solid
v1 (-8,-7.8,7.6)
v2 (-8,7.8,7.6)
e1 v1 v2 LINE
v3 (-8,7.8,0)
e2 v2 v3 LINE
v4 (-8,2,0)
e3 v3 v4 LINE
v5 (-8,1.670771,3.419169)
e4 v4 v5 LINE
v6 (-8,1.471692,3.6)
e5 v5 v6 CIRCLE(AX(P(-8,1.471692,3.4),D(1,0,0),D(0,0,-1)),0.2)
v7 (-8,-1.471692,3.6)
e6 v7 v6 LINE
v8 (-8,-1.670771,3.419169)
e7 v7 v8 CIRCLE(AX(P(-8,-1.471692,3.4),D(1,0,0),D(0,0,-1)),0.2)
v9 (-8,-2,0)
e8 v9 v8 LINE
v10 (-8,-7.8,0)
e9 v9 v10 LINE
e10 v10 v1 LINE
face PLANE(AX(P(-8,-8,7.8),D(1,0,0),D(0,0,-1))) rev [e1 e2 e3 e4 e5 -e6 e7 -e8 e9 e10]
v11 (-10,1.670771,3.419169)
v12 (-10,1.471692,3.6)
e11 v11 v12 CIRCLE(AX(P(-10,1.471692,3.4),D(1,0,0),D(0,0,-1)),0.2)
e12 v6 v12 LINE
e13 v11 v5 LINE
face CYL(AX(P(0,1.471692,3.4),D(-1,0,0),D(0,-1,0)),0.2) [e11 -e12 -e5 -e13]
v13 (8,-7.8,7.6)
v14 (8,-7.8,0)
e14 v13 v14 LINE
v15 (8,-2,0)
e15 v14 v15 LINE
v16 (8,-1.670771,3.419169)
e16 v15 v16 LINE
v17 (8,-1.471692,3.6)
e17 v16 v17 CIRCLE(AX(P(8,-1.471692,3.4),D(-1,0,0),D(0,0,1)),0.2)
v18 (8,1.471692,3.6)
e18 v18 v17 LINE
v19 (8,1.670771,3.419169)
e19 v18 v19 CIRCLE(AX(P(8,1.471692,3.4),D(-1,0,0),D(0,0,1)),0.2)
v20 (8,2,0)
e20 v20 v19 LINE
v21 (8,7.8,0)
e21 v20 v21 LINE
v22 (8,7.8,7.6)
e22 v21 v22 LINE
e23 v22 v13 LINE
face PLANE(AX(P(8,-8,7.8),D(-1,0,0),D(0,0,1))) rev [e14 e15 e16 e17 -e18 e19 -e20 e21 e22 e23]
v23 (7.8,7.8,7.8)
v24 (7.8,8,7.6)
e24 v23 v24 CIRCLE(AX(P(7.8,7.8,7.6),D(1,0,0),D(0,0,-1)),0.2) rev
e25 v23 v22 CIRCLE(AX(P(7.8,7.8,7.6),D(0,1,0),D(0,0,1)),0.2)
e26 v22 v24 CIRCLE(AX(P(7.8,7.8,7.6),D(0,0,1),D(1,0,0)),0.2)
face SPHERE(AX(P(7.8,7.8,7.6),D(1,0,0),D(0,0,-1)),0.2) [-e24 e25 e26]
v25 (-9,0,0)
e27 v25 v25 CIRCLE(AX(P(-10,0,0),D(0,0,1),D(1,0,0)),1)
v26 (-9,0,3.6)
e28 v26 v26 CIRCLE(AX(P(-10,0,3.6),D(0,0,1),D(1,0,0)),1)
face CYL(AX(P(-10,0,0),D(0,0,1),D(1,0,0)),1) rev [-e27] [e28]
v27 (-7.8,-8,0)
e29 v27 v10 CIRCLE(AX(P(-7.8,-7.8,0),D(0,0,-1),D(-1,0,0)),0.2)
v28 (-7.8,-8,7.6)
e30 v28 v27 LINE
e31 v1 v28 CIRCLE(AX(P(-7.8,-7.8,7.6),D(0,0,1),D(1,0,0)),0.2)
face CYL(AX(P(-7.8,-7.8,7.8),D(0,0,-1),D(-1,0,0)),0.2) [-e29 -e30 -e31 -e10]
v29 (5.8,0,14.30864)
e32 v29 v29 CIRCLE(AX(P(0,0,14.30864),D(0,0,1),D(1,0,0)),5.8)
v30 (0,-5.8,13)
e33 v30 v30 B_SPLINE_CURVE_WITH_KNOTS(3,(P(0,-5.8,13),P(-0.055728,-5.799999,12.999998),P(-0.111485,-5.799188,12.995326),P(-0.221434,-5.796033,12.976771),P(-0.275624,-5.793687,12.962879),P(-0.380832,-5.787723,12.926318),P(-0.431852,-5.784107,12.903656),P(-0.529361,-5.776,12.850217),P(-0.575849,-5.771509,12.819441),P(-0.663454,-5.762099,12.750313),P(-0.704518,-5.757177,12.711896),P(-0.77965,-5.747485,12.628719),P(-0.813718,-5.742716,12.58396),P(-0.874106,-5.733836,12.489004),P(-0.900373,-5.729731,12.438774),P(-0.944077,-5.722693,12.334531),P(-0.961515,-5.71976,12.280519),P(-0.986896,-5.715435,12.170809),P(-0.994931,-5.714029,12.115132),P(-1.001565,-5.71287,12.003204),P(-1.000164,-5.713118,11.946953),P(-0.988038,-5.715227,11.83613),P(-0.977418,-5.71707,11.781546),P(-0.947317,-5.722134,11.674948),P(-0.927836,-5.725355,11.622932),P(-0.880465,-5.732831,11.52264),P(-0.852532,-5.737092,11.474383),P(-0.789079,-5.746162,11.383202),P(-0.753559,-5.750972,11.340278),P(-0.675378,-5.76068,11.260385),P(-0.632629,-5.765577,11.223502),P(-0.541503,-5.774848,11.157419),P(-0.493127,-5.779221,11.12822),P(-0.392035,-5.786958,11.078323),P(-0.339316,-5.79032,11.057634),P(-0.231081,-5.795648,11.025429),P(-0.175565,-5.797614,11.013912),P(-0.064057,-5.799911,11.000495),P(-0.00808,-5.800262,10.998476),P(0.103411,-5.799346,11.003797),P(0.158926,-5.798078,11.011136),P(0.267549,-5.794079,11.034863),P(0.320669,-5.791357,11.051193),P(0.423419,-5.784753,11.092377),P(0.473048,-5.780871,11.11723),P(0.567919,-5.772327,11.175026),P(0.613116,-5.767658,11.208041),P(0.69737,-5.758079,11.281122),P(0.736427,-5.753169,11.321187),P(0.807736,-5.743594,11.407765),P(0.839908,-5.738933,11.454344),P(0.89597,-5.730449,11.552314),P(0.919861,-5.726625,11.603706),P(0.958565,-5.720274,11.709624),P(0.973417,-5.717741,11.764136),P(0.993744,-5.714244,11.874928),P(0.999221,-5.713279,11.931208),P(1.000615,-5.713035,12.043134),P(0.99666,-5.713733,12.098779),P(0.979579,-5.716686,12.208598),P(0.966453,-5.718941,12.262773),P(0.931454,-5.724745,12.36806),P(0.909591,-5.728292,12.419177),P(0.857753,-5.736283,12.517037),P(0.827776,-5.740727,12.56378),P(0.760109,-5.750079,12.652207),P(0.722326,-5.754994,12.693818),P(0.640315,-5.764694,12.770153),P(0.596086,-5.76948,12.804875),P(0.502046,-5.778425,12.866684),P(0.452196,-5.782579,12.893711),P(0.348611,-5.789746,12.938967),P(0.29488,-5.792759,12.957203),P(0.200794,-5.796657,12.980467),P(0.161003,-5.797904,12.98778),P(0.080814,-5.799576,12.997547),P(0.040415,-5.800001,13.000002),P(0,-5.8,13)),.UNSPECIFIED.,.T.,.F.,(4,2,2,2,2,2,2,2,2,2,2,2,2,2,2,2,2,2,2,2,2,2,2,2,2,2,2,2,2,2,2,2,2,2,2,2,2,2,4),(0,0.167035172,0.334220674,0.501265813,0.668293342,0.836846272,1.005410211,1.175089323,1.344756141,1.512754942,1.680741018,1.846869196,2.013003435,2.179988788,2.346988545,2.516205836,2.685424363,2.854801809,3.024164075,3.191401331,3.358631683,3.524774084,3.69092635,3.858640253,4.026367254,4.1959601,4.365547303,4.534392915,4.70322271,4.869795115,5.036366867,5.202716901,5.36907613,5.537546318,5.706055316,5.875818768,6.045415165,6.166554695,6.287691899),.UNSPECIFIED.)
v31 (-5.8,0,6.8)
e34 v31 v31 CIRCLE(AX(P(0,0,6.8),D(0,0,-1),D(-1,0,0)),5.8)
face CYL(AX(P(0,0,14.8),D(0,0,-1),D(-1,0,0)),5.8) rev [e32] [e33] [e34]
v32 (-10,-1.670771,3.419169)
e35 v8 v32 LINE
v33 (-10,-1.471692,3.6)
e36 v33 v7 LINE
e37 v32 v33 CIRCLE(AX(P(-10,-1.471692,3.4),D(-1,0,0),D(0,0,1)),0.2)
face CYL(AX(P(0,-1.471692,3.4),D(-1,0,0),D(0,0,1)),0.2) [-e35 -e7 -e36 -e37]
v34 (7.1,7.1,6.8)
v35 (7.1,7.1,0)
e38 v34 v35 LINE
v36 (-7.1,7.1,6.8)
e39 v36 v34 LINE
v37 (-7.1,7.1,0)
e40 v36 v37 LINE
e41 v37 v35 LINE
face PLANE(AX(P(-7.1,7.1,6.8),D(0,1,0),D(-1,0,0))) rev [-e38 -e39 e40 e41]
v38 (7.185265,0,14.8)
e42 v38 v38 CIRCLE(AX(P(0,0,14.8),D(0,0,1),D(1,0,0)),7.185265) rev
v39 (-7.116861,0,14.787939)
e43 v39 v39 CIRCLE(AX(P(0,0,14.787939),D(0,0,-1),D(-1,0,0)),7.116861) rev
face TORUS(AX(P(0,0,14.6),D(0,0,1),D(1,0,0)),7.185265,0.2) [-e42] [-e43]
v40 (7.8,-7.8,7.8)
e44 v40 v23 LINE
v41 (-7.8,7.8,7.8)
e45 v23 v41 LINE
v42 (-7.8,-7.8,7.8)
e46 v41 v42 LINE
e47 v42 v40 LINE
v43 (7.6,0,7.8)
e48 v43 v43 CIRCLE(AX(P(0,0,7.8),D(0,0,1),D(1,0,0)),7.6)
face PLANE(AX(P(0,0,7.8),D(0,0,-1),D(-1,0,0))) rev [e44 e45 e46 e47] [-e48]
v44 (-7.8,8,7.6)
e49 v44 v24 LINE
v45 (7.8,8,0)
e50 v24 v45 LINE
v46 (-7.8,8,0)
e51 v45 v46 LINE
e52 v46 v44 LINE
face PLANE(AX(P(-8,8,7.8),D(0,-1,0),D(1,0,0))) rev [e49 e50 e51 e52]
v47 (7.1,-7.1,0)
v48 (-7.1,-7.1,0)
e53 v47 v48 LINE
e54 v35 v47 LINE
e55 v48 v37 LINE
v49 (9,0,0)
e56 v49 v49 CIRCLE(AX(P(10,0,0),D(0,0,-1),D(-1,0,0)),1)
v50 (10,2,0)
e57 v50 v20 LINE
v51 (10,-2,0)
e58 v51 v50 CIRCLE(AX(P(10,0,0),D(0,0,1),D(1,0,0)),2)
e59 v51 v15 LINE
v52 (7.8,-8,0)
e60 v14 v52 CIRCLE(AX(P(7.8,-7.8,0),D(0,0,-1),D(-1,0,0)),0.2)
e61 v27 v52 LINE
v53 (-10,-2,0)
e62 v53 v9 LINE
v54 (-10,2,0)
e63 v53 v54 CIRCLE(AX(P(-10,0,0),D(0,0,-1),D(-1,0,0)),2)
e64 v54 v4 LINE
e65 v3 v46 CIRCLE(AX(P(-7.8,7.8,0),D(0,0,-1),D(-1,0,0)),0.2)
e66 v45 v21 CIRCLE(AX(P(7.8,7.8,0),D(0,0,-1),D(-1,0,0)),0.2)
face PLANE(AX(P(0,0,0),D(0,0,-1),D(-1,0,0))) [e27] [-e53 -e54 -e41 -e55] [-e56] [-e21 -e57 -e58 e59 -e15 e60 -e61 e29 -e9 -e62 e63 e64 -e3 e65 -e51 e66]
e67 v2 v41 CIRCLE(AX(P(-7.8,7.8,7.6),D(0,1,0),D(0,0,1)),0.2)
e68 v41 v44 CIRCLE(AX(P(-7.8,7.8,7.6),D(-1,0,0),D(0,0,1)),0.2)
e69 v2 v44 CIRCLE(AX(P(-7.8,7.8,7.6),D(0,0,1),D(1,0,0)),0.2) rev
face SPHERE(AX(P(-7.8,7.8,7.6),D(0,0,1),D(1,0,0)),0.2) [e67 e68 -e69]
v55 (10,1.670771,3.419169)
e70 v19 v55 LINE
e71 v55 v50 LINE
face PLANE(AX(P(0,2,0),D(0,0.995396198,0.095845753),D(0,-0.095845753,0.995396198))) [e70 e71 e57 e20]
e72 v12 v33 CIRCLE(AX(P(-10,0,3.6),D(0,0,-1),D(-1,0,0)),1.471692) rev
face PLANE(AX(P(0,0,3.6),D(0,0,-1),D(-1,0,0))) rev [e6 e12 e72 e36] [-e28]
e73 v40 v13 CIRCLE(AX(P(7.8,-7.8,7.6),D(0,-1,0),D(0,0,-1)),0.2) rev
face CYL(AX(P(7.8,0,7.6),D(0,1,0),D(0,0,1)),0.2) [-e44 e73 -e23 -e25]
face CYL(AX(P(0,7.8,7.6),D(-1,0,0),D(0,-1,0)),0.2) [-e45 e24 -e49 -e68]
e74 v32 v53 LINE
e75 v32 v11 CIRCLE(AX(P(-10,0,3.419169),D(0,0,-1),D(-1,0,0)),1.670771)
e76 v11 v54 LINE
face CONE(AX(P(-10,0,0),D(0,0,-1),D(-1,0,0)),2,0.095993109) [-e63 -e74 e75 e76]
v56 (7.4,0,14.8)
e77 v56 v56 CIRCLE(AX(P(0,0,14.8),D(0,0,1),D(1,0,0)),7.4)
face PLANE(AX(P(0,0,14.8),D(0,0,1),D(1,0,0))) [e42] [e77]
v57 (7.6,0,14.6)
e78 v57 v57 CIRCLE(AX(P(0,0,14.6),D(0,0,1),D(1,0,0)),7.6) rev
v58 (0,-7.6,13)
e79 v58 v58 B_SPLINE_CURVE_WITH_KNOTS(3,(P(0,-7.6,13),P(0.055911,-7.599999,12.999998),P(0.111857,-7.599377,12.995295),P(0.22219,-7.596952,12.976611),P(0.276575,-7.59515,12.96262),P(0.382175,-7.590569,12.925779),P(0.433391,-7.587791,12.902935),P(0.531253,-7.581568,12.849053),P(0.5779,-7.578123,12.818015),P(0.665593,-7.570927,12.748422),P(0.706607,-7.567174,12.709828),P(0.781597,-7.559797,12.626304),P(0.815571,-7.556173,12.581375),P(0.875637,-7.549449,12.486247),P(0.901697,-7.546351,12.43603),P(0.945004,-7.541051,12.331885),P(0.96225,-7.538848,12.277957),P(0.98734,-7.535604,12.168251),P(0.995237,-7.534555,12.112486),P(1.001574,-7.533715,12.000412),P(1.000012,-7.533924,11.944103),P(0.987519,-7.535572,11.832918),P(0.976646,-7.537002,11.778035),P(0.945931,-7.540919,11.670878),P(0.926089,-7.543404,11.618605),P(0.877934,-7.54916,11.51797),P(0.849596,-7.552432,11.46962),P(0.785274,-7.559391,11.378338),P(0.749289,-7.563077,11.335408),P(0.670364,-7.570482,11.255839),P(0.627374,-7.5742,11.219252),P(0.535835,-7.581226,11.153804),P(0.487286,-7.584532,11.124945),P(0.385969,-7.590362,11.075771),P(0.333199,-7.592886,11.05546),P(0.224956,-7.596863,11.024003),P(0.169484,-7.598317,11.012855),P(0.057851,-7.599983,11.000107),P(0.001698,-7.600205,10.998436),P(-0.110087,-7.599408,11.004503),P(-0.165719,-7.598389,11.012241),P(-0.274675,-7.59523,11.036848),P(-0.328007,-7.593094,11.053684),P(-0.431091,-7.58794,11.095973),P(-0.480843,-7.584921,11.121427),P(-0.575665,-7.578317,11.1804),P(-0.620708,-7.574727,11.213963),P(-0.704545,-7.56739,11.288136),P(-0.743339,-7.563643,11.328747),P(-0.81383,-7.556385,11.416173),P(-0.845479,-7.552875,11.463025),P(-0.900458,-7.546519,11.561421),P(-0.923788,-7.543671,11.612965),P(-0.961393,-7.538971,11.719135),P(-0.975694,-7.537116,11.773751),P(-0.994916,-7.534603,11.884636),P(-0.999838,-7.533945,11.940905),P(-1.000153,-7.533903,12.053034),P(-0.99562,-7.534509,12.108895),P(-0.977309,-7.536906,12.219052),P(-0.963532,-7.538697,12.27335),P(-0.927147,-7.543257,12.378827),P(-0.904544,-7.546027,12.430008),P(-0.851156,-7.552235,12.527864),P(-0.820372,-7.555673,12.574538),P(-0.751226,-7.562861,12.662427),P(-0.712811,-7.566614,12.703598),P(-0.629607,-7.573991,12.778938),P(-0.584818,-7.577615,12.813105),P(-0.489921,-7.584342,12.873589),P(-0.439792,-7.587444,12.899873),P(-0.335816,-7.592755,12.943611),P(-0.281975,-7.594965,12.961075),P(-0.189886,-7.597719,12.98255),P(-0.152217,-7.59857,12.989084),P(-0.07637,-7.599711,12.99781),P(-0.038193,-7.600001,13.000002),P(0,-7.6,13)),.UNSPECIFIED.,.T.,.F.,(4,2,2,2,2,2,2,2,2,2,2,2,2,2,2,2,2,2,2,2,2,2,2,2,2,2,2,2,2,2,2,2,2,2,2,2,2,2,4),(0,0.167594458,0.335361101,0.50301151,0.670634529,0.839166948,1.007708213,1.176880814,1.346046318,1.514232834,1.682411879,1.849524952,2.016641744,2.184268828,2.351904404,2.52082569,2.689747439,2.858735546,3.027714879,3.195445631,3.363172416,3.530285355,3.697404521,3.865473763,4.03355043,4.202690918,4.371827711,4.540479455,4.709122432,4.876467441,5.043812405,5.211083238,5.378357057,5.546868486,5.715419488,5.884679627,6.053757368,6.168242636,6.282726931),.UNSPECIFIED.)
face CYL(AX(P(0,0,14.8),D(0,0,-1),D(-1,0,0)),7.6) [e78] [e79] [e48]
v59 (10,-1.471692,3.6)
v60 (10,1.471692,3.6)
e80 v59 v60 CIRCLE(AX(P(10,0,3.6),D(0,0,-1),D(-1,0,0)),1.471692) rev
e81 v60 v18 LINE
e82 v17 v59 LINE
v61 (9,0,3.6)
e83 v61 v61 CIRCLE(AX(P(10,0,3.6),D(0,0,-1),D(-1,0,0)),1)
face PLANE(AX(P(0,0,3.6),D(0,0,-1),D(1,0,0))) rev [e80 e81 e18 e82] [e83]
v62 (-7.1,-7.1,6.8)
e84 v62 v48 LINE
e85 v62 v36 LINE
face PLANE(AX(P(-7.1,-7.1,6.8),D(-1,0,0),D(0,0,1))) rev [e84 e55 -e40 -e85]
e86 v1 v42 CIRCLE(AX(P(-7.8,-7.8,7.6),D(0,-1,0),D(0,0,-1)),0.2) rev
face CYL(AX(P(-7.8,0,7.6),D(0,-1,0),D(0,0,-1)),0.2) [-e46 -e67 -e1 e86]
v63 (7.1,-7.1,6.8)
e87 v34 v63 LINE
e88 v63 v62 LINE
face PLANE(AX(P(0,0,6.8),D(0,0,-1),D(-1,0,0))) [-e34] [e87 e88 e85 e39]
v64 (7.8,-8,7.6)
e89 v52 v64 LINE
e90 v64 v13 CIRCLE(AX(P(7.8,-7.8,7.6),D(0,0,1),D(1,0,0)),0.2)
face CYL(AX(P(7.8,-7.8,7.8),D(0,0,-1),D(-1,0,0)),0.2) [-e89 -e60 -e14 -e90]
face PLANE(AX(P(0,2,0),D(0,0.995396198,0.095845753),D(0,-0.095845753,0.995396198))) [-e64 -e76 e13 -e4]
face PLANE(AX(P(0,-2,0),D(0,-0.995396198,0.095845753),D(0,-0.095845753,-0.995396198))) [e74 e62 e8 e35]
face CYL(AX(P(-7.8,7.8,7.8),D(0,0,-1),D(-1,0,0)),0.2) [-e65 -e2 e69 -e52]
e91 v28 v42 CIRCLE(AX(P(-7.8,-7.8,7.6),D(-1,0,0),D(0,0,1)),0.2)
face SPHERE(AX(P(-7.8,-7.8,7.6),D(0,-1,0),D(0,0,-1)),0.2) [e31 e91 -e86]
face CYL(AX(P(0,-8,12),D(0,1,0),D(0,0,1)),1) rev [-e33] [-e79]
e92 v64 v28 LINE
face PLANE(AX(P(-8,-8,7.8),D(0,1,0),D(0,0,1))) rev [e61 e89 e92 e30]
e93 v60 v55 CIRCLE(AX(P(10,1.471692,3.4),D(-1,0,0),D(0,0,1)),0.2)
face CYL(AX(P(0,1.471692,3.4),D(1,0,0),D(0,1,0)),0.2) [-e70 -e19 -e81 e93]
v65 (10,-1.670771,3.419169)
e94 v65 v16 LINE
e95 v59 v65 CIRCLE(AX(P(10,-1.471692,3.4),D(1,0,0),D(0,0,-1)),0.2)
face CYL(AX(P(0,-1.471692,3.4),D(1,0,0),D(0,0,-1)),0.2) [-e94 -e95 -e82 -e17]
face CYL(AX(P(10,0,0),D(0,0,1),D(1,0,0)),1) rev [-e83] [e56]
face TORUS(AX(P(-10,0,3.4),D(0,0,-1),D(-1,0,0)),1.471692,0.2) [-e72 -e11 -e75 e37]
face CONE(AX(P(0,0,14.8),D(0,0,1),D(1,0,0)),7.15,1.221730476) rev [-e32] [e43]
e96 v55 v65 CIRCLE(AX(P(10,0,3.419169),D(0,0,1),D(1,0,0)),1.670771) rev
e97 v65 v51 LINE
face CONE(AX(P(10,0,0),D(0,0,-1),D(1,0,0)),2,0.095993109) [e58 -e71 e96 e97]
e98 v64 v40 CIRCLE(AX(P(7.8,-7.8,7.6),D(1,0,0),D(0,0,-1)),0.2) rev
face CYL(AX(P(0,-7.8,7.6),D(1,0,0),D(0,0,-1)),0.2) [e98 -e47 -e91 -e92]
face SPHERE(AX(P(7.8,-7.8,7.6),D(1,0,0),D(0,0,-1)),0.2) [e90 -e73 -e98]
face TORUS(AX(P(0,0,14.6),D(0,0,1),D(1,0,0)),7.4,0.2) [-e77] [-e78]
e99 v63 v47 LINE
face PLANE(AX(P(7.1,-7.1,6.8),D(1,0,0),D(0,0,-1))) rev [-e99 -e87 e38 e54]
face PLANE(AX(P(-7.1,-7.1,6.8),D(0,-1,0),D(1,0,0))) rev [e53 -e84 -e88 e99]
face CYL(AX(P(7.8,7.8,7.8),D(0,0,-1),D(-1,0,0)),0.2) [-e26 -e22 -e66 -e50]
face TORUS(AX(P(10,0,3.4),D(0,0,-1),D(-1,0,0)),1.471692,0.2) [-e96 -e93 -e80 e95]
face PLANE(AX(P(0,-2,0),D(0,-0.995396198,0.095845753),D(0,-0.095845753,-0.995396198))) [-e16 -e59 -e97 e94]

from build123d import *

# Parameters (mm, degrees)
SKETCH_1_W             = 16
SKETCH_1_H             = 16
EXTRUDE_1_DEPTH        = 7.8
SKETCH_2_R             = 7.6
EXTRUDE_2_DEPTH        = 7
EXTRUDE_3_DEPTH        = 3.6
EXTRUDE_3_TAPER        = 5.5
SKETCH_4_R             = 1
CUT_EXTRUDE_1_DEPTH    = 19.260339646
FILLET_1_R             = 0.2
FILLET_1_OF_MIRROR_1_R = 0.2
SKETCH_5_W             = 14.2
SKETCH_5_H             = 14.2
CUT_EXTRUDE_2_DEPTH    = 6.8
SKETCH_6_R             = 5.8
CUT_EXTRUDE_3_DEPTH    = 17.492422624
CHAMFER_1_SIZE         = 1.35
CHAMFER_1_SIZE2        = 0.491359816
FILLET_2_R             = 0.2
SKETCH_7_R             = 1
CUT_EXTRUDE_4_DEPTH    = 21.664946262
FILLET_3_R             = 0.2


with BuildPart() as part:
    # 草图1 → 凸台-拉伸1 (new body)
    with BuildSketch(Plane.XY):
        Rectangle(SKETCH_1_W, SKETCH_1_H)
    extrude(amount=EXTRUDE_1_DEPTH)

    # 草图2 → 凸台-拉伸2 (add)
    with BuildSketch(Plane.XY.offset(7.8)):
        Circle(SKETCH_2_R)
    extrude(amount=EXTRUDE_2_DEPTH)

    # 草图3 → 凸台-拉伸3 (add)
    with BuildSketch(Plane(origin=(0, 0, 0), x_dir=(-1, 0, 0), z_dir=(0, 0, -1))):
        with BuildLine():
            Line((10, 2), (4, 2))
            Line((4, 2), (4, -2))
            Line((4, -2), (10, -2))
            ThreePointArc((10, -2), (12, 0), (10, 2))
        make_face()
    extrude_3 = extrude(amount=-EXTRUDE_3_DEPTH, taper=EXTRUDE_3_TAPER)

    # 草图4 → 切除-拉伸1 (cut, through all)
    with BuildSketch(Plane.XY.offset(3.6)):
        with Locations((-10, 0)):
            Circle(SKETCH_4_R)
    cut_extrude_1 = extrude(amount=-CUT_EXTRUDE_1_DEPTH, mode=Mode.SUBTRACT)

    # 圆角1
    fillet_1_edges = [part.edges().sort_by_distance(p)[0] for p in [
        (-9, 1.653359426, 3.6),
        (-11.653359426, 0, 3.6),
        (-9, -1.653359426, 3.6),
    ]]
    fillet(fillet_1_edges, radius=FILLET_1_R)

    # 镜向1: 凸台-拉伸3, 切除-拉伸1 across plane
    add(extrude_3.mirror(Plane(origin=(0, 0, 0), x_dir=(0, 0, 1), z_dir=(1, 0, 0))))
    add(cut_extrude_1.mirror(Plane(origin=(0, 0, 0), x_dir=(0, 0, 1), z_dir=(1, 0, 0))), mode=Mode.SUBTRACT)

    # 圆角1 of 镜向1
    fillet_1_of_mirror_1_edges = [part.edges().sort_by_distance(p)[0] for p in [
        (9, 1.653359426, 3.6),
        (11.653359426, 0, 3.6),
        (9, -1.653359426, 3.6),
    ]]
    fillet(fillet_1_of_mirror_1_edges, radius=FILLET_1_OF_MIRROR_1_R)

    # 草图5 → 切除-拉伸2 (cut)
    with BuildSketch(Plane(origin=(0, 0, 0), x_dir=(-1, 0, 0), z_dir=(0, 0, -1))):
        Rectangle(SKETCH_5_W, SKETCH_5_H)
    extrude(amount=-CUT_EXTRUDE_2_DEPTH, mode=Mode.SUBTRACT)

    # 草图6 → 切除-拉伸3 (cut, through all)
    with BuildSketch(Plane(origin=(0, 0, 6.8), x_dir=(-1, 0, 0), z_dir=(0, 0, -1))):
        Circle(SKETCH_6_R)
    extrude(amount=-CUT_EXTRUDE_3_DEPTH, mode=Mode.SUBTRACT)

    # 倒角1
    chamfer_1_edges = [part.edges().sort_by_distance(p)[0] for p in [
        (5.8, 0, 14.8),
    ]]
    chamfer_1_side = [part.faces().sort_by_distance(p)[0] for p in [
        (-7.385039539, 0, 14.8),
    ]]
    chamfer(chamfer_1_edges, length=CHAMFER_1_SIZE, length2=CHAMFER_1_SIZE2, reference=chamfer_1_side[0])

    # 圆角2
    fillet_2_edges = [part.edges().sort_by_distance(p)[0] for p in [
        (-7.6, 0, 14.8),
        (7.15, 0, 14.8),
    ]]
    fillet(fillet_2_edges, radius=FILLET_2_R)

    # 草图7 → 切除-拉伸4 (cut, through all)
    with BuildSketch(Plane(origin=(0, 0, 0), x_dir=(1, 0, 0), z_dir=(0, 1, 0))):
        with Locations((0, -12)):
            Circle(SKETCH_7_R)
    extrude(amount=-CUT_EXTRUDE_4_DEPTH, mode=Mode.SUBTRACT)

    # 圆角3
    fillet_3_edges = [part.edges().sort_by_distance(p)[0] for p in [
        (-8, 0, 7.8),
        (0, 8, 7.8),
        (8, 0, 7.8),
        (0, -8, 7.8),
        (-8, 8, 3.9),
        (8, 8, 3.9),
        (8, -8, 3.9),
        (-8, -8, 3.9),
    ]]
    fillet(fillet_3_edges, radius=FILLET_3_R)


solid = part.part
